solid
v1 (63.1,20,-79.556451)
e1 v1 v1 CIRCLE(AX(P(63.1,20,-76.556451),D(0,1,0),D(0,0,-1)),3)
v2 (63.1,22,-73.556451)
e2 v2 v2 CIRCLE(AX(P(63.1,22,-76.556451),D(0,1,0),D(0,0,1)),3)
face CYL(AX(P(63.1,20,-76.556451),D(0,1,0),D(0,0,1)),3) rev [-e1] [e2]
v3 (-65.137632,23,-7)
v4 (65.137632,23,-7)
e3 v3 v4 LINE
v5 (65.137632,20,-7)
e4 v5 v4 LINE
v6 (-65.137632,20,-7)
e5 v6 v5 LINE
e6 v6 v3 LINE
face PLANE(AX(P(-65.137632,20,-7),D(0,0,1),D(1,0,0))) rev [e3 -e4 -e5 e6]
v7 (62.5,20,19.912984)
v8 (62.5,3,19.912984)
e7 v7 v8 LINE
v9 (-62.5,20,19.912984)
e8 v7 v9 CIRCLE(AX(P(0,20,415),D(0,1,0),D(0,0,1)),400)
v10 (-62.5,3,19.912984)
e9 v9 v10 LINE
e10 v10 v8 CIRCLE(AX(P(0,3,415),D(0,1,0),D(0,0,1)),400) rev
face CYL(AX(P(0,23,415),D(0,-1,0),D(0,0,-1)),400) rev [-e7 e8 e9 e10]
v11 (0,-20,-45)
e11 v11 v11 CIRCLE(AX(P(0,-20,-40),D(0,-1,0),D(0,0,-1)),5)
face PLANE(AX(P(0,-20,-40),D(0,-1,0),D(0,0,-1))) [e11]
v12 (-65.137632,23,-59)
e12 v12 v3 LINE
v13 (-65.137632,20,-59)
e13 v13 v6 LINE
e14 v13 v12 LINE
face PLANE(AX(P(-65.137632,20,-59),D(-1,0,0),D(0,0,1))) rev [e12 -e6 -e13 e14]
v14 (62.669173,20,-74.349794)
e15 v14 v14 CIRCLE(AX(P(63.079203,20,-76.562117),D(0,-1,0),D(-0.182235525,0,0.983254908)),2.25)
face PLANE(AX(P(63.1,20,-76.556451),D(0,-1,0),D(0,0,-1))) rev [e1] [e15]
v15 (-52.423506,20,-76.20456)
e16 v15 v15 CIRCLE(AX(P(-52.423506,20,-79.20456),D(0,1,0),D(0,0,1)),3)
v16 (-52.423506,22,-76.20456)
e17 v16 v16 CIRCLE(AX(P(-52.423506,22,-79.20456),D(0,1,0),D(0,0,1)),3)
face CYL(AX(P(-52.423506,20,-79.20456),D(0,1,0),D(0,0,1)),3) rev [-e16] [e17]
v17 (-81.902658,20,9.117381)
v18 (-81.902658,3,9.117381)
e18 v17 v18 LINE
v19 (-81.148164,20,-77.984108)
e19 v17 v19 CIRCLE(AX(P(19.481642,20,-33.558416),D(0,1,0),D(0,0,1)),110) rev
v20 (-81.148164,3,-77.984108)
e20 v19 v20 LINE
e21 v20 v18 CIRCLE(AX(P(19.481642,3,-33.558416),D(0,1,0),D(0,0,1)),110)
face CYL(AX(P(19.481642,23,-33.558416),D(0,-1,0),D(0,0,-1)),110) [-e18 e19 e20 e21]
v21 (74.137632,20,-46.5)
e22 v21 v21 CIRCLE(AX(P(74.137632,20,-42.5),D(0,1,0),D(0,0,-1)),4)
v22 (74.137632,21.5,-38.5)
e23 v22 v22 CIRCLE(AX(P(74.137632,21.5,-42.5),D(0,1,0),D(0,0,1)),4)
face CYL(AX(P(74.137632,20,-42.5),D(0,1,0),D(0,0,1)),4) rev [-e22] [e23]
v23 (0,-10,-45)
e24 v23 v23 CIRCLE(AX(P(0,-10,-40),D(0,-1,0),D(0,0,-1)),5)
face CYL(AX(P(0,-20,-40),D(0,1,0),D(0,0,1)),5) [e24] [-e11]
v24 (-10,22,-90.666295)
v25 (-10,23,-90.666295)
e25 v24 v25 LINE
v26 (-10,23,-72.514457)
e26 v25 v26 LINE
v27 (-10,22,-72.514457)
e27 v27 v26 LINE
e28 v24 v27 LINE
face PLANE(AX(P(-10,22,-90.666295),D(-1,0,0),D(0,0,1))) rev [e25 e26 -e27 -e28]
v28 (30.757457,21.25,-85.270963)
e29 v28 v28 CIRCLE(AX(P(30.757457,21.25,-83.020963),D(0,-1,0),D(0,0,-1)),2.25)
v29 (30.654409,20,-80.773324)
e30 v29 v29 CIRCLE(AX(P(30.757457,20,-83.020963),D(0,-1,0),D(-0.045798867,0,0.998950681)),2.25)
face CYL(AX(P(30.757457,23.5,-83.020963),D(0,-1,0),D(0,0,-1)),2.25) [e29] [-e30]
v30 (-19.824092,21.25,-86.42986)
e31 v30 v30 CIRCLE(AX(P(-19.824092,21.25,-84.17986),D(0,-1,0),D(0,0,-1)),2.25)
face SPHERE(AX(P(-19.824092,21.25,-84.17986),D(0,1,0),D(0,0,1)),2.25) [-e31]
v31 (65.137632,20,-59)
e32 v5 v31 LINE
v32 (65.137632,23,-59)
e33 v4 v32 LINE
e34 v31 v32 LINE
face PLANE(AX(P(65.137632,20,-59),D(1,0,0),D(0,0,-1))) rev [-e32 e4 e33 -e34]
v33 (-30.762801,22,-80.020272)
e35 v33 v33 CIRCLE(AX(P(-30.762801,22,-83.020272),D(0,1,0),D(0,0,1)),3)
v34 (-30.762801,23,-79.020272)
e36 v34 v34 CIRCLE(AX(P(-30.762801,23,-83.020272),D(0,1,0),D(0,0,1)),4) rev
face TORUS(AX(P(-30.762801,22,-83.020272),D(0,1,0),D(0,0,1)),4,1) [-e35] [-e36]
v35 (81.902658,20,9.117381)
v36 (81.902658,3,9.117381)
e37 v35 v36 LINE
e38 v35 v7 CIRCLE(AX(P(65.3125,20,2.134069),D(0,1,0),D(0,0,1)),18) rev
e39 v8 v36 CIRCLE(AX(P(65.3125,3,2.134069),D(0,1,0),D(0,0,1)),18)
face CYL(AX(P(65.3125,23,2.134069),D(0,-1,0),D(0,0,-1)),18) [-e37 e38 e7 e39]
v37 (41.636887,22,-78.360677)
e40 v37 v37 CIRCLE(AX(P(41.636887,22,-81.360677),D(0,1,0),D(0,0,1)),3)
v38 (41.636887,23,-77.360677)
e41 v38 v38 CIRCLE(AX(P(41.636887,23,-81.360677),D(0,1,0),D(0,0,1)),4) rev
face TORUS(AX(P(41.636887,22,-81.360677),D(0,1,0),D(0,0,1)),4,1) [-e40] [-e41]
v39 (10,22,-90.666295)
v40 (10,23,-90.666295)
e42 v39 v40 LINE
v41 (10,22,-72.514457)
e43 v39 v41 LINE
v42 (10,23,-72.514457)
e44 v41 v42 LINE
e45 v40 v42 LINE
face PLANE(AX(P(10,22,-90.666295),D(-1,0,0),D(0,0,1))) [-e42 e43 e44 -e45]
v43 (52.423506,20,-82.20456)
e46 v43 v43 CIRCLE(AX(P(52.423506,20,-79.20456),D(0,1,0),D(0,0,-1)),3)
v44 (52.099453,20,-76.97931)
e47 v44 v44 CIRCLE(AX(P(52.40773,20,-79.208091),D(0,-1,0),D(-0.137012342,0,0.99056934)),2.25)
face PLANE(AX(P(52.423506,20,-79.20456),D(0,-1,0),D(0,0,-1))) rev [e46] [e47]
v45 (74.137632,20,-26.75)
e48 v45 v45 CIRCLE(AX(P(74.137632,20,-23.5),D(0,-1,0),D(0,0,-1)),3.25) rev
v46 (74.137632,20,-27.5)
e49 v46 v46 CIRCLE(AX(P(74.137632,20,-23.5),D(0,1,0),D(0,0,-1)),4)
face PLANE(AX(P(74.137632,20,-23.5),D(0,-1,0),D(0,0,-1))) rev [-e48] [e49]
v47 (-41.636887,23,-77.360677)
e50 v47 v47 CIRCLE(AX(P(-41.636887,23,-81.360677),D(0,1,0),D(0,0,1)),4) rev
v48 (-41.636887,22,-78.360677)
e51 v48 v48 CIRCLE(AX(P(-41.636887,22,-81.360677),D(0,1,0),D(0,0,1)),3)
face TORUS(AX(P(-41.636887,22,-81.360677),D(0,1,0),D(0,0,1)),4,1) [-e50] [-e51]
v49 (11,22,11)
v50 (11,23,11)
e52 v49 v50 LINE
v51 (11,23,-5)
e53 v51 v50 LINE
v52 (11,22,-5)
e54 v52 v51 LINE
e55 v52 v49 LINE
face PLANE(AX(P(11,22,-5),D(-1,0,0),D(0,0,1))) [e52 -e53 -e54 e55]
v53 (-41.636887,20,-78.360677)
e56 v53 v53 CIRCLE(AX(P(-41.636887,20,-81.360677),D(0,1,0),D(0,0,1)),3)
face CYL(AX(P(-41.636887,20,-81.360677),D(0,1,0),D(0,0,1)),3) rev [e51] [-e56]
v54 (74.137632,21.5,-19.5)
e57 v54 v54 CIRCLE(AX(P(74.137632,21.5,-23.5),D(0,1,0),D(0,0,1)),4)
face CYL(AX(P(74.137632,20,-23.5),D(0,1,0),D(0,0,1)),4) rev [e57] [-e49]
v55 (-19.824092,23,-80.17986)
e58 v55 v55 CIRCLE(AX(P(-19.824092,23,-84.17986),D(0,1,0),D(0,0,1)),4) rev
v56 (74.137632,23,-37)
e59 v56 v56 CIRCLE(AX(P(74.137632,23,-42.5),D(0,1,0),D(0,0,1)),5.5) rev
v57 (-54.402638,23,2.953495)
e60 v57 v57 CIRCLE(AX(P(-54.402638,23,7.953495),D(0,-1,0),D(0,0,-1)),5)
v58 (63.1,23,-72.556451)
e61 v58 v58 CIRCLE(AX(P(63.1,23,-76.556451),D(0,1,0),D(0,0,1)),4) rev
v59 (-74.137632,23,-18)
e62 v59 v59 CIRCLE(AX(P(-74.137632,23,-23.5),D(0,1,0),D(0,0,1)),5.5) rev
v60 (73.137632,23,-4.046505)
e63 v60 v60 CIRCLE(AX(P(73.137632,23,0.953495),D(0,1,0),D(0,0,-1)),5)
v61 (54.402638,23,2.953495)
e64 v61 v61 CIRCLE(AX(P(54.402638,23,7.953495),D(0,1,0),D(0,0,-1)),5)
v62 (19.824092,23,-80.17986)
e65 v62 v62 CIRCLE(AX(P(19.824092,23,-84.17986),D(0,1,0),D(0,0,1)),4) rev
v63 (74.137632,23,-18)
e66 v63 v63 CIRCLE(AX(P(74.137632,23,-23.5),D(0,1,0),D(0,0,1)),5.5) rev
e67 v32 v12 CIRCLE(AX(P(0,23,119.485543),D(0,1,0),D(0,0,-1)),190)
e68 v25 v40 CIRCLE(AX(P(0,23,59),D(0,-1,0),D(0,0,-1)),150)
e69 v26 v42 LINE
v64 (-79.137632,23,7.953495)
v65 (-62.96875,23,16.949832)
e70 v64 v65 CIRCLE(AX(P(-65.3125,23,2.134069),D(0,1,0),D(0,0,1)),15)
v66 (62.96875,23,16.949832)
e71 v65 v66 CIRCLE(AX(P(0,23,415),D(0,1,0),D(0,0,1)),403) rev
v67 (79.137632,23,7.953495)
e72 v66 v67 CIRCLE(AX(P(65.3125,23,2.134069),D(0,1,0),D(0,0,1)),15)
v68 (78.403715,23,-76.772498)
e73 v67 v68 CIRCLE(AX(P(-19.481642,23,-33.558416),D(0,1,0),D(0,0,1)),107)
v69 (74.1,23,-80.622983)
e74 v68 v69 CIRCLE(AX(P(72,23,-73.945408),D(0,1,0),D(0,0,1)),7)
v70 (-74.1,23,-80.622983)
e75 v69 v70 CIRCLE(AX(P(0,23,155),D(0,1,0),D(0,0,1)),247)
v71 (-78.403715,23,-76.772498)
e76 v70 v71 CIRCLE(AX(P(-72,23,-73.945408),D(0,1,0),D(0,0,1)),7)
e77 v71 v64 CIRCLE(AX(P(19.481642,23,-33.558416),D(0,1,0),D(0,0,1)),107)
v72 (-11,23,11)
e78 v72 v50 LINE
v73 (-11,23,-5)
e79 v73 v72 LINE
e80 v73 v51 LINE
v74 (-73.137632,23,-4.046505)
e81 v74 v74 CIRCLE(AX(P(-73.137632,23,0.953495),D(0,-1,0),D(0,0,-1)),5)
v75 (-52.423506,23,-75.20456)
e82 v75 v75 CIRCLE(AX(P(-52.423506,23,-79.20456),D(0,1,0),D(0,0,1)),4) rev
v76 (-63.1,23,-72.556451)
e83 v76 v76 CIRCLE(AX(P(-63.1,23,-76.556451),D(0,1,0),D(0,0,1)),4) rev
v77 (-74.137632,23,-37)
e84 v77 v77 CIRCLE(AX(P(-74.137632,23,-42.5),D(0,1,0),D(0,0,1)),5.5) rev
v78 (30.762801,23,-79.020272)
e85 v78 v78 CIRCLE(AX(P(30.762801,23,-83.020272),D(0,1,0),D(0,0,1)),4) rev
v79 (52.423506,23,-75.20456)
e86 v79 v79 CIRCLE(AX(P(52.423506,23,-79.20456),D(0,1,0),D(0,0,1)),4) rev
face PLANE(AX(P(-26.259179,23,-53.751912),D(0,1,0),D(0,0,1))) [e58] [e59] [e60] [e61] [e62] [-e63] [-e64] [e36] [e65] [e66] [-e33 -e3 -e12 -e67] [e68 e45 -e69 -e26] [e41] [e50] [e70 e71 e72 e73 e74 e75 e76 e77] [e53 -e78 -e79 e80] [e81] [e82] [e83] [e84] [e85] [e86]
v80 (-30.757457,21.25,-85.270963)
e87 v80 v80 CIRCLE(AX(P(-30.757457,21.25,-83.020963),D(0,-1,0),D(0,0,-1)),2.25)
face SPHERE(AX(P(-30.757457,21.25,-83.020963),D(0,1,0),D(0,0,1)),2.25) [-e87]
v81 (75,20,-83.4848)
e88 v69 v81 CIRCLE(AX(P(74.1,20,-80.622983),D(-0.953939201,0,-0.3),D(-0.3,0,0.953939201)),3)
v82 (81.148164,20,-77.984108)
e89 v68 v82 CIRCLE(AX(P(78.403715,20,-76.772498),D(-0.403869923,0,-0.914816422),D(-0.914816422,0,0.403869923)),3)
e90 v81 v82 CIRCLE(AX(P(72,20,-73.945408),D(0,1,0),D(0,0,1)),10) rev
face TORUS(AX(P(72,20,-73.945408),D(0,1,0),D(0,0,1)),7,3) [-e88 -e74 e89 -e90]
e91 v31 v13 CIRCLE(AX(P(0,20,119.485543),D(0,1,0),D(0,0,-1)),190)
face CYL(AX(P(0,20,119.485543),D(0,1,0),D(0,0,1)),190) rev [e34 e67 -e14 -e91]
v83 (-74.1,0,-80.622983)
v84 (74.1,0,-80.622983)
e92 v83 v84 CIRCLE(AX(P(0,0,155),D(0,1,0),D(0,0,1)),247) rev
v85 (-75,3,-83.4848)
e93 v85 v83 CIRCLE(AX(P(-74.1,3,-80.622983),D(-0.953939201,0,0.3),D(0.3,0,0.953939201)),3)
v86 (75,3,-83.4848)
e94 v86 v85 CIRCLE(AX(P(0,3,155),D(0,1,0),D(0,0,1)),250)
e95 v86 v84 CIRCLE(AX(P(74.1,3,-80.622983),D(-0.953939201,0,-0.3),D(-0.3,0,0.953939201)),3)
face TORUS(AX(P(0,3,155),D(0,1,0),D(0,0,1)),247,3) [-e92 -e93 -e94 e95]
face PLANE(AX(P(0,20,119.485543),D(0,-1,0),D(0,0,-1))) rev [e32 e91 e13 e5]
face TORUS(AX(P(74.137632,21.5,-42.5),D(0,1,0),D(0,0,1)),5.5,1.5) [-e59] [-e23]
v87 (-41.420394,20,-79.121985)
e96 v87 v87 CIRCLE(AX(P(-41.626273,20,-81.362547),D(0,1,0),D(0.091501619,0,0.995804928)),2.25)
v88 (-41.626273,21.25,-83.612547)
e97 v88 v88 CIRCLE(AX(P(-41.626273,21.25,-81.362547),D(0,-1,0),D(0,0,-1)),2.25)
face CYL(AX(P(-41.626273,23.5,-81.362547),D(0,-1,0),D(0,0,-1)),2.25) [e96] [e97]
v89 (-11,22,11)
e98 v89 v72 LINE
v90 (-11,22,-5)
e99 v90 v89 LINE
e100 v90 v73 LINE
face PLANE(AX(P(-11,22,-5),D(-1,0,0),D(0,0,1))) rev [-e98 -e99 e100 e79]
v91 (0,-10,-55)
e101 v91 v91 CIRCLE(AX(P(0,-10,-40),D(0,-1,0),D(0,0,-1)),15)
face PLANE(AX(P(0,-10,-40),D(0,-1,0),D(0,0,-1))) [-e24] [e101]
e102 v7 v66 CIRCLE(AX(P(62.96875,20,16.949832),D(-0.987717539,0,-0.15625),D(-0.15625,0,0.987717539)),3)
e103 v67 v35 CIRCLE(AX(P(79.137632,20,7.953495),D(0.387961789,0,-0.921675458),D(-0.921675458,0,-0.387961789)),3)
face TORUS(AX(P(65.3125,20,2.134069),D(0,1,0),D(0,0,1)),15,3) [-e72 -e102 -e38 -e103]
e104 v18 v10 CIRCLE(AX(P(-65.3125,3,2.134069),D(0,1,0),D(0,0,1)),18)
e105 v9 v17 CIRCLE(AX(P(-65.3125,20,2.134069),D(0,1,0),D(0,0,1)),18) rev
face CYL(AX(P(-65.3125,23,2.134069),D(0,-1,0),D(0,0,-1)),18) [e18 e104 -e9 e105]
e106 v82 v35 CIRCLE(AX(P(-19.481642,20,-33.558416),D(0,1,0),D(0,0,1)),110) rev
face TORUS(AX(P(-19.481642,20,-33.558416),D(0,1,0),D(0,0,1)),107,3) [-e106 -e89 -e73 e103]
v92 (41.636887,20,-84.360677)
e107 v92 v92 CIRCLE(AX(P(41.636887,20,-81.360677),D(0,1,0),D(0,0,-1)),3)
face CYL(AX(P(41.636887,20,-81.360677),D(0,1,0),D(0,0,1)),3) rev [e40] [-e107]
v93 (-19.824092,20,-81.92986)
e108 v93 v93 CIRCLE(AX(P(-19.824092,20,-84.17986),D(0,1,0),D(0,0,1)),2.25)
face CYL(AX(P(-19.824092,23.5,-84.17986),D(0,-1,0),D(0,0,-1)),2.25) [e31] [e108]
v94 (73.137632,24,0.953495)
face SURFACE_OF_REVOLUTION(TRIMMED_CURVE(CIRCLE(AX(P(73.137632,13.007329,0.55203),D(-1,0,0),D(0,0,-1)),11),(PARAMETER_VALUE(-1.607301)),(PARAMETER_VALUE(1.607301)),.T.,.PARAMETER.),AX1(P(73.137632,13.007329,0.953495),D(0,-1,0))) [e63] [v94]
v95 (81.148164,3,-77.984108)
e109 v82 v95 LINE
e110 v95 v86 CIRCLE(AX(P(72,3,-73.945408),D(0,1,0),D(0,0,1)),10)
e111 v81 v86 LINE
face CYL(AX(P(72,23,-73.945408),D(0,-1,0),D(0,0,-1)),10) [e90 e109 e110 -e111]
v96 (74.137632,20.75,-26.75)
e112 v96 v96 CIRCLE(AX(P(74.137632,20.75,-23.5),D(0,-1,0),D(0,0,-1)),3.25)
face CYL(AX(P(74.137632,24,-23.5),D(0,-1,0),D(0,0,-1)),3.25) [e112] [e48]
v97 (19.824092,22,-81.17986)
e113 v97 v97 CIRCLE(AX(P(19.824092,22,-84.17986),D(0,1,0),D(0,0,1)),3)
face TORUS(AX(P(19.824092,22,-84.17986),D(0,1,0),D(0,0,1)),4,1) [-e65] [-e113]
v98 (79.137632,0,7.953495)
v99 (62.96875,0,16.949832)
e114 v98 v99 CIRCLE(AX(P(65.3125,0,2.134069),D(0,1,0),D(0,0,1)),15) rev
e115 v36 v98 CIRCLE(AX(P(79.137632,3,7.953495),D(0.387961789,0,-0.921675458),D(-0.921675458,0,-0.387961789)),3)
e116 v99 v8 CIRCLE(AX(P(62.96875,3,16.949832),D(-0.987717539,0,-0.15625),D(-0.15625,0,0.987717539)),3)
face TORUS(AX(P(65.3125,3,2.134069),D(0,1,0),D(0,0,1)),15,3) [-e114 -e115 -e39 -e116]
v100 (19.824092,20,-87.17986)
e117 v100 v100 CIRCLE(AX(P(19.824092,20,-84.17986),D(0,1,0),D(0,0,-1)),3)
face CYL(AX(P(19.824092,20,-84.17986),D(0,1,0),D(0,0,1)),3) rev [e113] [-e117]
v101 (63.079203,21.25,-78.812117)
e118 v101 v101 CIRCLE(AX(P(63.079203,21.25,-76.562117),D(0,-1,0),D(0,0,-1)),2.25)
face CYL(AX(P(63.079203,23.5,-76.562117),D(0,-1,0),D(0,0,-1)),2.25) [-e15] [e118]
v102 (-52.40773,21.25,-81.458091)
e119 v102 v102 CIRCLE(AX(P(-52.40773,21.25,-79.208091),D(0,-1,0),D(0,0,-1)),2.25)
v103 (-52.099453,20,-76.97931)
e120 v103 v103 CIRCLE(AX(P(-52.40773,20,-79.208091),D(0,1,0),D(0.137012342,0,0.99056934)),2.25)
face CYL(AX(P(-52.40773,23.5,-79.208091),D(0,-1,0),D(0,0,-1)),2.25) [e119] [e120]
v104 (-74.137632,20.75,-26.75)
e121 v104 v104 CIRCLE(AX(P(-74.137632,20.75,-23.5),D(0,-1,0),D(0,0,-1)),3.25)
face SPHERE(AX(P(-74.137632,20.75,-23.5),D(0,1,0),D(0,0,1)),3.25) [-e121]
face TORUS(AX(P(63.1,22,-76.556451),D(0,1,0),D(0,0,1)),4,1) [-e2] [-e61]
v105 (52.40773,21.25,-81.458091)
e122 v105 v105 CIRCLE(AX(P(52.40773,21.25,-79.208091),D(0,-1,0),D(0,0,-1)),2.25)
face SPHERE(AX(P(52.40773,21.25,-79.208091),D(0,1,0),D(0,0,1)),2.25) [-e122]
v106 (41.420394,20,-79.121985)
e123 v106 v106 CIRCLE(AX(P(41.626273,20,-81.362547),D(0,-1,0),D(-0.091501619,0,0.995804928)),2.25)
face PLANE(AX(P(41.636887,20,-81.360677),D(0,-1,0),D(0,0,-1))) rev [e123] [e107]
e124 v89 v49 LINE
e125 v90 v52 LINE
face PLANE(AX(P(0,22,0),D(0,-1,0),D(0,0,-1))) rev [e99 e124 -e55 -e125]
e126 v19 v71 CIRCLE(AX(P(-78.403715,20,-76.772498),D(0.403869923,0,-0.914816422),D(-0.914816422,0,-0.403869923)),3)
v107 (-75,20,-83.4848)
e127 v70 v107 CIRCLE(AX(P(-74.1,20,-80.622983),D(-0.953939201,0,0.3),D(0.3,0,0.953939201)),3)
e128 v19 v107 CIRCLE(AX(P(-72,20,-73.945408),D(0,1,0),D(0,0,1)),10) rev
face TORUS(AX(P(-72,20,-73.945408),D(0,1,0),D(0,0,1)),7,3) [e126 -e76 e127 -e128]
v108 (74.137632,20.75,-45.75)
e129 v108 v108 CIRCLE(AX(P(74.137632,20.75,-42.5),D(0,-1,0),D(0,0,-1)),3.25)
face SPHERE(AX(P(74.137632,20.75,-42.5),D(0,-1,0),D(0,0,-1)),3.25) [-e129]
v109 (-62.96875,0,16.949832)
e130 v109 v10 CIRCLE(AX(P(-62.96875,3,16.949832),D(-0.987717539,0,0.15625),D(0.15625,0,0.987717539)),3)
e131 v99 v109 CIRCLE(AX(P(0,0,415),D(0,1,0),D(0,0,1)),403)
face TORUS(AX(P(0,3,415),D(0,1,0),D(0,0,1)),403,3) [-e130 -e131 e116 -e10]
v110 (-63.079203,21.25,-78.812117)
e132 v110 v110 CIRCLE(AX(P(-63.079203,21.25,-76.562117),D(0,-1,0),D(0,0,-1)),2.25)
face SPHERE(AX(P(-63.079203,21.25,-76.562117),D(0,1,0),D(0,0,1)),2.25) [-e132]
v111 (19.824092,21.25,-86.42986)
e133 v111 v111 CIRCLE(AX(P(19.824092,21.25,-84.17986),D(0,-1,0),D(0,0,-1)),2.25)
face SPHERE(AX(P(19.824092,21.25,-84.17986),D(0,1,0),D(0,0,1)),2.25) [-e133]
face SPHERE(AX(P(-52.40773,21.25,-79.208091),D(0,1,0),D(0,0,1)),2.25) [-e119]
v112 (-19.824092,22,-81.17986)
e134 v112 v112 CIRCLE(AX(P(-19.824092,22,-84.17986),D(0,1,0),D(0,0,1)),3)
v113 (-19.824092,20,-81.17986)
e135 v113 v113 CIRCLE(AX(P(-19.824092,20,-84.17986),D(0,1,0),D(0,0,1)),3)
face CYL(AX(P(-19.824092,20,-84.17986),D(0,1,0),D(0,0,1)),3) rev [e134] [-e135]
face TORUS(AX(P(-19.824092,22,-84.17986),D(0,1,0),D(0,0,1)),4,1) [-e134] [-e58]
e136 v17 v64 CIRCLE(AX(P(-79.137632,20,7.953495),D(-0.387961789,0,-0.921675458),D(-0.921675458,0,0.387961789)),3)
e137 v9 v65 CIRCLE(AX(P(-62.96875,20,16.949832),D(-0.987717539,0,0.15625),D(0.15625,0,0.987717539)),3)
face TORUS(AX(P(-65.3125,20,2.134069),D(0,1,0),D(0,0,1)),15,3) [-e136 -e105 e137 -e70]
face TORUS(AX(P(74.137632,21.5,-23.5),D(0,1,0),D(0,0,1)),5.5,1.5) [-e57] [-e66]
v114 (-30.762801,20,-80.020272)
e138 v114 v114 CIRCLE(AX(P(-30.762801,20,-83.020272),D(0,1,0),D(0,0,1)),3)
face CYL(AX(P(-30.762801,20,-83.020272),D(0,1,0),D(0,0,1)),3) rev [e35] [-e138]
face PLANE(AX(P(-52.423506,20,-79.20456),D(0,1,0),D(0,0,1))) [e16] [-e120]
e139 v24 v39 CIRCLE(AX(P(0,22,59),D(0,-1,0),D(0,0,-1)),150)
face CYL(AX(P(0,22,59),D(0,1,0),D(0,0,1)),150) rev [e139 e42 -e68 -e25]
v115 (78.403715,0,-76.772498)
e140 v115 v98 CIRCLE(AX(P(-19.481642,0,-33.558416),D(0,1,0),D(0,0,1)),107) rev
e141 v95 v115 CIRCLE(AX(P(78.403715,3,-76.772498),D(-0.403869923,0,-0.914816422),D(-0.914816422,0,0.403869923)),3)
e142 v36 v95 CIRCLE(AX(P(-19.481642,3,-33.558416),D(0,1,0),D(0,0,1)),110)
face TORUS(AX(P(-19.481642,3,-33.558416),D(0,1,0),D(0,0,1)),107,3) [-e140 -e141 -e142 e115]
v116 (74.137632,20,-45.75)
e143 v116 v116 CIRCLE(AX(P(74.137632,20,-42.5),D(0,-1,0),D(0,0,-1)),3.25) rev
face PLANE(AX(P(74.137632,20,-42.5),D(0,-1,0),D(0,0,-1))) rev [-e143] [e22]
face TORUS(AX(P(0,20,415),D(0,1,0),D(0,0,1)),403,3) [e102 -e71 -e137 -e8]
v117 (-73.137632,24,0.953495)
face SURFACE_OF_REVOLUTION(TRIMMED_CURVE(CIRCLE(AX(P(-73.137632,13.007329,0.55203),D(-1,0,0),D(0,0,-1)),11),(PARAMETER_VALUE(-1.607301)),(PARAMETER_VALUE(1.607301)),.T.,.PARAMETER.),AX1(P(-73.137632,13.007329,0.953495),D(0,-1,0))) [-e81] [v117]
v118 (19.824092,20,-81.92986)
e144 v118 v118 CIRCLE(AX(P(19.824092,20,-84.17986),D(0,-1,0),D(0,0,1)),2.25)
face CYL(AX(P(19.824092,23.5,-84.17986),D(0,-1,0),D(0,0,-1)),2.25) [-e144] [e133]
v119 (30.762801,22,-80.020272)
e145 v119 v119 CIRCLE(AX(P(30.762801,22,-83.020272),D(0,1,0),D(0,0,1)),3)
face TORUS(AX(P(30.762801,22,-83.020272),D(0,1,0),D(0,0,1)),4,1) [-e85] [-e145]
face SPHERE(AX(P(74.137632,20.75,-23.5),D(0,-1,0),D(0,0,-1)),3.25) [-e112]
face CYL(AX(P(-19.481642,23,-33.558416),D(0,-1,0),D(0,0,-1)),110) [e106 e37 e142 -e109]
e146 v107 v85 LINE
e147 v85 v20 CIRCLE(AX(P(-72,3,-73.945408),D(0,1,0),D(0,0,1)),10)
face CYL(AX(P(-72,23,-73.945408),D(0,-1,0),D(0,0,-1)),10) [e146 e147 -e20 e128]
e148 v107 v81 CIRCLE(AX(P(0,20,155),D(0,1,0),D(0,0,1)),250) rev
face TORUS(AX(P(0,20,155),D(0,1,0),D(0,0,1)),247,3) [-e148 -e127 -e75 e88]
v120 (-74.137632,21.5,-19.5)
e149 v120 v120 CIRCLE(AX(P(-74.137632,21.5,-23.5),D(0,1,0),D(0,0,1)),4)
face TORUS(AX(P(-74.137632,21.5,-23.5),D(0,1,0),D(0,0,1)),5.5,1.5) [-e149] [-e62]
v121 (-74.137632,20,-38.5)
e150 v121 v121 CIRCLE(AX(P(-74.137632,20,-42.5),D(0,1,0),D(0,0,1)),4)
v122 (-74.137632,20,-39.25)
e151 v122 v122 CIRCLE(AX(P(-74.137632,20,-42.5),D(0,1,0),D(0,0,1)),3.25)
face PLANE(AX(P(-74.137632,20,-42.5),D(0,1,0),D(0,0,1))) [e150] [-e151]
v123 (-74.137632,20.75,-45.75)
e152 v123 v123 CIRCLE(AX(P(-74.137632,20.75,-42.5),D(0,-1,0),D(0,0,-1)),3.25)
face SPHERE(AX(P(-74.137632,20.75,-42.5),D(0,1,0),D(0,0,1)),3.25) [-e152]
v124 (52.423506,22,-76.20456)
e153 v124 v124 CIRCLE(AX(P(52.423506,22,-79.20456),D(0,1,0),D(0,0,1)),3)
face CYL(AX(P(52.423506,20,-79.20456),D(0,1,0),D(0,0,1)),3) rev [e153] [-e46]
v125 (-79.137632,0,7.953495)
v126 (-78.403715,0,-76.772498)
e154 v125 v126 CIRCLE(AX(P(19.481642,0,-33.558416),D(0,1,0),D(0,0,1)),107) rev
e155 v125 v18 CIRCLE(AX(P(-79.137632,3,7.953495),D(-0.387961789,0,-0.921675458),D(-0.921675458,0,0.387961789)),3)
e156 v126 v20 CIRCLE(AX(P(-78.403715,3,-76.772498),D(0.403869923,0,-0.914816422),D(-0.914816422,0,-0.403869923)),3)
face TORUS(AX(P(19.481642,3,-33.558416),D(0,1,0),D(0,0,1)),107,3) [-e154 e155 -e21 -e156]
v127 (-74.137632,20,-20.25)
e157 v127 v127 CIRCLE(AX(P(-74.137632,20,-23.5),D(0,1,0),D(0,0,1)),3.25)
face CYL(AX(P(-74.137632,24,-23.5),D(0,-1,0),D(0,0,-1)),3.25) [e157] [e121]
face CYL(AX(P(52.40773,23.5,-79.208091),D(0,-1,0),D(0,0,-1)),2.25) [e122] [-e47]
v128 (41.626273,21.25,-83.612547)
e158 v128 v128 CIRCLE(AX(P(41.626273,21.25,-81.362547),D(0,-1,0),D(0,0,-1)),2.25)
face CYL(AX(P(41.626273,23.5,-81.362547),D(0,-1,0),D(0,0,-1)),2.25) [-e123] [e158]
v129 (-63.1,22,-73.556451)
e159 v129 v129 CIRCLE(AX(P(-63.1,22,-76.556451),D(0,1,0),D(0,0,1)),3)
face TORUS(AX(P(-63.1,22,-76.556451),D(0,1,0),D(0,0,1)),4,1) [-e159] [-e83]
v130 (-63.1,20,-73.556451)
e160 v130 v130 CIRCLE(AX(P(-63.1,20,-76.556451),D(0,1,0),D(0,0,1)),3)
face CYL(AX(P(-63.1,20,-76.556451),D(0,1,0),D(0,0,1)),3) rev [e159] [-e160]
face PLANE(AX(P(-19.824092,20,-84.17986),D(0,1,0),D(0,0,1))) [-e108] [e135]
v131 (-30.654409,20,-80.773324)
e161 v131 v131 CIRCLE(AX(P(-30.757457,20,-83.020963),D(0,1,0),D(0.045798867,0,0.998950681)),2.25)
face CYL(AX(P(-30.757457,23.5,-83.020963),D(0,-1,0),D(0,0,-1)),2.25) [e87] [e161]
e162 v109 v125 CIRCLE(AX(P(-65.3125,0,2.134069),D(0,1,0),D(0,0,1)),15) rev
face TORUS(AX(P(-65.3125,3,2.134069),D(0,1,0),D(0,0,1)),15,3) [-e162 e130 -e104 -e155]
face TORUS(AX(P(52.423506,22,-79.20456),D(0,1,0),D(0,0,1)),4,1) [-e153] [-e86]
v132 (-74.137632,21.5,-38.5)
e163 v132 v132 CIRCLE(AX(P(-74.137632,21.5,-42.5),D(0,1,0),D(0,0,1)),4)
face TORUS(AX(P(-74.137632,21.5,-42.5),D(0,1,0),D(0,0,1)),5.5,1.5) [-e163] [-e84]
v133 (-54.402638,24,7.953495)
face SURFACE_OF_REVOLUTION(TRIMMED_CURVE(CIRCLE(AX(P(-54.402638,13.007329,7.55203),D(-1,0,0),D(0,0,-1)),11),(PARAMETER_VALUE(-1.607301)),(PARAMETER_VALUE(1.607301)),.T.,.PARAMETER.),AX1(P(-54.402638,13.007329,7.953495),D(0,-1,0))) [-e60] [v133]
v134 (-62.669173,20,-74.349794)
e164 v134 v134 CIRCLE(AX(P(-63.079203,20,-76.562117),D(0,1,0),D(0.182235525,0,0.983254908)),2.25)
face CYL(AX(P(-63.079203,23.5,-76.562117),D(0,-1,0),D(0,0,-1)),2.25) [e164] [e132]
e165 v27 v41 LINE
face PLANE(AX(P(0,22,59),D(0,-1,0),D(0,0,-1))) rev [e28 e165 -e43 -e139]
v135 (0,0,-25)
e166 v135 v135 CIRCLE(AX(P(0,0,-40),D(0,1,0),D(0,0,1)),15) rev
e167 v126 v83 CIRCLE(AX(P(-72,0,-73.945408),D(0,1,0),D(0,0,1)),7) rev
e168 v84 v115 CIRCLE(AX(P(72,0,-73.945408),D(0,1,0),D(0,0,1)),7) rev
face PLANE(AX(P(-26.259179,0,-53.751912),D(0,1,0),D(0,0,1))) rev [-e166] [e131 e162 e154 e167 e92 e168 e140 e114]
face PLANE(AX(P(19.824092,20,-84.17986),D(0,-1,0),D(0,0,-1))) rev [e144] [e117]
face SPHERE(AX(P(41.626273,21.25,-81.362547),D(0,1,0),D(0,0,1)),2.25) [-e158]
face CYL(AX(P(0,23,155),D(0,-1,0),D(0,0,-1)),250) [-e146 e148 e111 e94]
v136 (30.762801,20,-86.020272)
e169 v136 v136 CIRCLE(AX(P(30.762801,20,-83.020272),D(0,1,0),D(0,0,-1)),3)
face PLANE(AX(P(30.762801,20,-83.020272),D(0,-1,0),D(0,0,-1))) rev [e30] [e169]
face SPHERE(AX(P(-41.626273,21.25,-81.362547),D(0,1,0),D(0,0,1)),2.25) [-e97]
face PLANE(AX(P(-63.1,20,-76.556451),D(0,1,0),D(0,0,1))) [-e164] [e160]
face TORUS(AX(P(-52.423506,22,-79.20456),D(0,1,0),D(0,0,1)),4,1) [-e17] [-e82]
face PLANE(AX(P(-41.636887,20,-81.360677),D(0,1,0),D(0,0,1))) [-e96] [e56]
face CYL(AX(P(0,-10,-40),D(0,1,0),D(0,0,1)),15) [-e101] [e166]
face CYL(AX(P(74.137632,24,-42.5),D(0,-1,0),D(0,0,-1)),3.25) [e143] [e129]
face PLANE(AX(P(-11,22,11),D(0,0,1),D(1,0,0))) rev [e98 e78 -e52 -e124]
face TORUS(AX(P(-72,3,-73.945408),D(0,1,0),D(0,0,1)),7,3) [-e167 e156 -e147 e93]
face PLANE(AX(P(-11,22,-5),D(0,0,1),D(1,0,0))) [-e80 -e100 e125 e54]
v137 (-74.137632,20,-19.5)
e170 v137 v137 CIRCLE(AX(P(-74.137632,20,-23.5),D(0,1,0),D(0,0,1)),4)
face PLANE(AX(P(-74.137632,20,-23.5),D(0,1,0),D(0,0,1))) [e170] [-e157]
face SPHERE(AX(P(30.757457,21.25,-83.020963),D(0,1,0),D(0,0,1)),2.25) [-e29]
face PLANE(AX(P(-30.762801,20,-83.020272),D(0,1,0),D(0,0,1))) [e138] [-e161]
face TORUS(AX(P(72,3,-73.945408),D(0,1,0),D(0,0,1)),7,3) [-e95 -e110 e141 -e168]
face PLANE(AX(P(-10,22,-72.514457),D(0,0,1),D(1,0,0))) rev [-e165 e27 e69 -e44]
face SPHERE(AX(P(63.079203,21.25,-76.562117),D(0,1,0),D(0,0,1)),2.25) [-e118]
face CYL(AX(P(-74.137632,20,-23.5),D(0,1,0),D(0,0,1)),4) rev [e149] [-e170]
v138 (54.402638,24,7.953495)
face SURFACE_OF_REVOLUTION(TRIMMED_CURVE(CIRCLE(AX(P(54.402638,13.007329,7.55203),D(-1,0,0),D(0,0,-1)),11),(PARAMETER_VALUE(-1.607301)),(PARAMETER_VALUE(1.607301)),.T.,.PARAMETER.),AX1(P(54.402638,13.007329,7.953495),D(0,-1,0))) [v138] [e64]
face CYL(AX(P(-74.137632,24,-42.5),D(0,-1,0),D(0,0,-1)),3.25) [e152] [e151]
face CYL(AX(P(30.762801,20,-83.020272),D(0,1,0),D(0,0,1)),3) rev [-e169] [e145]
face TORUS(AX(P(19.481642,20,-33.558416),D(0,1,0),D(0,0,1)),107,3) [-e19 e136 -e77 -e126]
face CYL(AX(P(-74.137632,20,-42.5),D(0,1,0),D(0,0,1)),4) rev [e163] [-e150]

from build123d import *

# Parameters (mm, degrees)
BOSS_EXTRUDE1_DEPTH      = 23
FILLET1_R                = 3
CUT_EXTRUDE1_DEPTH       = 3
CUT_EXTRUDE2_DEPTH       = 1
SKETCH4_R                = 3
CUT_EXTRUDE3_DEPTH       = 3
FILLET2_R                = 1
SKETCH5_R                = 2.25
BOSS_EXTRUDE2_DEPTH      = 3.5
FILLET5_R                = 2.25
CIRPATTERN1_COUNT        = 5
CIRPATTERN1_ANGLE        = 10.5
FILLET5_OF_CIRPATTERN1_R = 2.25
SKETCH7_R                = 4
CUT_EXTRUDE4_DEPTH       = 3
FILLET6_R                = 1.5
SKETCH8_R                = 3.25
BOSS_EXTRUDE4_DEPTH      = 4
FILLET7_R                = 3.25
LPATTERN1_COUNT          = 2
LPATTERN1_PITCH          = 20
SKETCH13_W               = 22
SKETCH13_H               = 16
CUT_EXTRUDE5_DEPTH       = 1
SKETCH14_R               = 15
BOSS_EXTRUDE5_DEPTH      = 10
SKETCH15_R               = 5
BOSS_EXTRUDE6_DEPTH      = 10


# Read off the part's stored shape, not the designer's step: Mirror1
with BuildPart() as part:
    # Sketch1 → Boss-Extrude1 (new body)
    with BuildSketch(Plane(origin=(0, 0, 0), x_dir=(1, 0, 0), z_dir=(0, 1, 0))):
        with BuildLine():
            ThreePointArc((-75, 83.484800354), (0, 95), (75, 83.484800354))
            ThreePointArc((75, 83.484800354), (78.66774915, 81.397999921), (81.148164216, 77.984107572))
            ThreePointArc((81.148164216, 77.984107572), (90.514231183, 34.511226724), (81.902658248, -9.117380762))
            ThreePointArc((81.902658248, -9.117380762), (74.064198719, -17.863269733), (62.5, -19.912984268))
            ThreePointArc((62.5, -19.912984268), (0, -15), (-62.5, -19.912984268))
            ThreePointArc((-62.5, -19.912984268), (-74.064198719, -17.863269733), (-81.902658248, -9.117380762))
            ThreePointArc((-81.902658248, -9.117380762), (-90.514231183, 34.511226724), (-81.148164216, 77.984107572))
            ThreePointArc((-81.148164216, 77.984107572), (-78.66774915, 81.397999921), (-75, 83.484800354))
        make_face()
    extrude(amount=BOSS_EXTRUDE1_DEPTH)

    # Fillet1
    fillet1_edges = [part.edges().sort_by_distance(p)[0] for p in [
        (-74.064198719, 23, 17.863269733),
        (-90.514231183, 0, -34.511226724),
        (-78.66774915, 0, -81.397999921),
        (0, 23, 15),
        (74.064198719, 23, 17.863269733),
        (90.514231183, 23, -34.511226724),
        (78.66774915, 23, -81.397999921),
        (0, 23, -95),
        (-78.66774915, 23, -81.397999921),
        (-90.514231183, 23, -34.511226724),
        (0, 0, -95),
        (78.66774915, 0, -81.397999921),
        (90.514231183, 0, -34.511226724),
        (74.064198719, 0, 17.863269733),
        (0, 0, 15),
        (-74.064198719, 0, 17.863269733),
    ]]
    fillet(fillet1_edges, radius=FILLET1_R)

    # Sketch2 → Cut-Extrude1 (cut)
    with BuildSketch(Plane(origin=(0, 23, 0), x_dir=(1, 0, 0), z_dir=(0, 1, 0))):
        with BuildLine():
            Line((-65.137631873, 59), (-65.137631873, 7))
            Line((-65.137631873, 7), (65.137631873, 7))
            Line((65.137631873, 7), (65.137631873, 59))
            ThreePointArc((65.137631873, 59), (0, 70.514457409), (-65.137631873, 59))
        make_face()
    extrude(amount=-CUT_EXTRUDE1_DEPTH, mode=Mode.SUBTRACT)

    # Sketch3 → Cut-Extrude2 (cut)
    with BuildSketch(Plane(origin=(0, 23, 0), x_dir=(1, 0, 0), z_dir=(0, 1, 0))):
        with BuildLine():
            Line((-10, 90.666295471), (-10, 72.514457409))
            Line((-10, 72.514457409), (10, 72.514457409))
            Line((10, 72.514457409), (10, 90.666295471))
            ThreePointArc((10, 90.666295471), (0, 91), (-10, 90.666295471))
        make_face()
    extrude(amount=-CUT_EXTRUDE2_DEPTH, mode=Mode.SUBTRACT)

    # Sketch4 → Cut-Extrude3 (cut)
    with BuildSketch(Plane(origin=(0, 23, 0), x_dir=(1, 0, 0), z_dir=(0, 1, 0))):
        with Locations(Location((-63.1, 76.556451001, 0), (0, 0, 270))):
            Circle(SKETCH4_R)
        with Locations(Location((-52.423506287, 79.204560136, 0), (0, 0, 270))):
            Circle(SKETCH4_R)
        with Locations(Location((-41.636886805, 81.360677053, 0), (0, 0, 270))):
            Circle(SKETCH4_R)
        with Locations(Location((-30.762800947, 83.020272409, 0), (0, 0, 270))):
            Circle(SKETCH4_R)
        with Locations(Location((-19.824091844, 84.179859902, 0), (0, 0, 270))):
            Circle(SKETCH4_R)
        with Locations(Location((63.1, 76.556451001, 0), (0, 0, 90))):
            Circle(SKETCH4_R)
        with Locations(Location((41.636886805, 81.360677053, 0), (0, 0, 90))):
            Circle(SKETCH4_R)
        with Locations(Location((52.423506287, 79.204560136, 0), (0, 0, 90))):
            Circle(SKETCH4_R)
        with Locations(Location((19.824091844, 84.179859902, 0), (0, 0, 90))):
            Circle(SKETCH4_R)
        with Locations(Location((30.762800947, 83.020272409, 0), (0, 0, 90))):
            Circle(SKETCH4_R)
    extrude(amount=-CUT_EXTRUDE3_DEPTH, mode=Mode.SUBTRACT)

    # Fillet2
    fillet2_edges = [part.edges().sort_by_distance(p)[0] for p in [
        (-63.1, 23, -79.556451001),
        (-52.423506287, 23, -82.204560136),
        (-41.636886805, 23, -84.360677053),
        (-30.762800947, 23, -86.020272409),
        (-19.824091844, 23, -87.179859902),
        (63.1, 23, -73.556451001),
        (41.636886805, 23, -78.360677053),
        (52.423506287, 23, -76.204560136),
        (19.824091844, 23, -81.179859902),
        (30.762800947, 23, -80.020272409),
    ]]
    fillet(fillet2_edges, radius=FILLET2_R)

    # Sketch5 → Boss-Extrude2 (add)
    with BuildSketch(Plane(origin=(0, 20, 0), x_dir=(1, 0, 0), z_dir=(0, 1, 0))):
        with Locations(Location((-19.824091844, 84.179859902, 0), (0, 0, 270))):
            Circle(SKETCH5_R)
    boss_extrude2 = extrude(amount=BOSS_EXTRUDE2_DEPTH)

    # Fillet5
    fillet5_edges = [part.edges().sort_by_distance(p)[0] for p in [
        (-19.824091844, 23.5, -86.429859902),
    ]]
    fillet(fillet5_edges, radius=FILLET5_R)

    # CirPattern1: Boss-Extrude2 ×5 about axis
    cirpattern1_axis = Axis((0, 0, 155), (0, 1, 0))
    for i in range(1, CIRPATTERN1_COUNT):
        add(boss_extrude2.rotate(cirpattern1_axis, i * CIRPATTERN1_ANGLE / (CIRPATTERN1_COUNT - 1)))

    # Fillet5 of CirPattern1
    fillet5_of_cirpattern1_edges = [part.edges().sort_by_distance(p)[0] for p in [
        (-30.860504083, 23.5, -85.268602105),
        (-41.832151317, 23.5, -83.603107661),
        (-52.71600804, 23.5, -81.436871841),
        (-63.489232982, 23.5, -78.774440786),
    ]]
    fillet(fillet5_of_cirpattern1_edges, radius=FILLET5_OF_CIRPATTERN1_R)

    # Mirror1 outline → Mirror1 (revolve)
    with BuildSketch(Plane(origin=(19.824091844, 0, -84.179859902), x_dir=(1, 0, 0), z_dir=(0, 0, 1))):
        with BuildLine():
            Line((2.25, 20), (2.25, 21.249999998))
            ThreePointArc((2.25, 21.249999998), (1.590990258, 22.840990257), (0, 23.5))
            Line((0, 23.5), (0, 20))
            Line((0, 20), (2.25, 20))
        make_face()
    revolve(axis=Axis((19.824091844, 0, -84.179859902), (0, 1, 0)))

    # Mirror1 2 outline → Mirror1 2 (revolve)
    with BuildSketch(Plane(origin=(30.757456632, 0, -83.020963072), x_dir=(1, 0, 0), z_dir=(0, 0, 1))):
        with BuildLine():
            Line((2.25, 20), (2.25, 21.249999998))
            ThreePointArc((2.25, 21.249999998), (1.590990258, 22.840990257), (0, 23.5))
            Line((0, 23.5), (0, 20))
            Line((0, 20), (2.25, 20))
        make_face()
    revolve(axis=Axis((30.757456632, 0, -83.020963072), (0, 1, 0)))

    # Mirror1 3 outline → Mirror1 3 (revolve)
    with BuildSketch(Plane(origin=(41.626272675, 0, -81.362546574), x_dir=(1, 0, 0), z_dir=(0, 0, 1))):
        with BuildLine():
            Line((2.25, 20), (2.25, 21.249999998))
            ThreePointArc((2.25, 21.249999998), (1.590990258, 22.840990257), (0, 23.5))
            Line((0, 23.5), (0, 20))
            Line((0, 20), (2.25, 20))
        make_face()
    revolve(axis=Axis((41.626272675, 0, -81.362546574), (0, 1, 0)))

    # Mirror1 4 outline → Mirror1 4 (revolve)
    with BuildSketch(Plane(origin=(52.407730271, 0, -79.208090825), x_dir=(1, 0, 0), z_dir=(0, 0, 1))):
        with BuildLine():
            Line((2.25, 20), (2.25, 21.249999998))
            ThreePointArc((2.25, 21.249999998), (1.590990258, 22.840990257), (0, 23.5))
            Line((0, 23.5), (0, 20))
            Line((0, 20), (2.25, 20))
        make_face()
    revolve(axis=Axis((52.407730271, 0, -79.208090825), (0, 1, 0)))

    # Mirror1 5 outline → Mirror1 5 (revolve)
    with BuildSketch(Plane(origin=(63.07920305, 0, -76.562117244), x_dir=(1, 0, 0), z_dir=(0, 0, 1))):
        with BuildLine():
            Line((2.25, 20), (2.25, 21.249999998))
            ThreePointArc((2.25, 21.249999998), (1.590990258, 22.840990257), (0, 23.5))
            Line((0, 23.5), (0, 20))
            Line((0, 20), (2.25, 20))
        make_face()
    revolve(axis=Axis((63.07920305, 0, -76.562117244), (0, 1, 0)))

    # Sketch7 → Cut-Extrude4 (cut)
    with BuildSketch(Plane(origin=(0, 23, 0), x_dir=(1, 0, 0), z_dir=(0, 1, 0))):
        with Locations(Location((-74.137631873, 42.5, 0), (0, 0, 270))):
            Circle(SKETCH7_R)
        with Locations(Location((-74.137631873, 23.5, 0), (0, 0, 270))):
            Circle(SKETCH7_R)
        with Locations(Location((74.137631873, 23.5, 0), (0, 0, 90))):
            Circle(SKETCH7_R)
        with Locations(Location((74.137631873, 42.5, 0), (0, 0, 90))):
            Circle(SKETCH7_R)
    extrude(amount=-CUT_EXTRUDE4_DEPTH, mode=Mode.SUBTRACT)

    # Fillet6
    fillet6_edges = [part.edges().sort_by_distance(p)[0] for p in [
        (-74.137631873, 23, -46.5),
        (-74.137631873, 23, -27.5),
        (74.137631873, 23, -19.5),
        (74.137631873, 23, -38.5),
    ]]
    fillet(fillet6_edges, radius=FILLET6_R)

    # Sketch8 → Boss-Extrude4 (add)
    with BuildSketch(Plane(origin=(0, 20, 0), x_dir=(1, 0, 0), z_dir=(0, 1, 0))):
        with Locations(Location((-74.137631873, 42.5, 0), (0, 0, 270))):
            Circle(SKETCH8_R)
        with Locations(Location((-74.137631873, 23.5, 0), (0, 0, 270))):
            Circle(SKETCH8_R)
        with Locations(Location((74.137631873, 23.5, 0), (0, 0, 90))):
            Circle(SKETCH8_R)
        with Locations(Location((74.137631873, 42.5, 0), (0, 0, 90))):
            Circle(SKETCH8_R)
    extrude(amount=BOSS_EXTRUDE4_DEPTH)

    # Fillet7
    fillet7_edges = [part.edges().sort_by_distance(p)[0] for p in [
        (-74.137631873, 24, -45.75),
        (-74.137631873, 24, -26.75),
        (74.137631873, 24, -20.25),
        (74.137631873, 24, -39.25),
    ]]
    fillet(fillet7_edges, radius=FILLET7_R)

    # Sketch11 → Revolve1 (revolve)
    with BuildSketch(Plane.XY.offset(0.953495395)):
        with BuildLine():
            Line((-78.137631873, 23), (-73.137631873, 23))
            Line((-73.137631873, 23), (-73.137631873, 24))
            ThreePointArc((-73.137631873, 24), (-75.696375073, 23.793715997), (-78.137631873, 23))
        make_face()
    revolve1 = revolve(axis=Axis((-73.137631873, 23, 0.953495395), (0, 1, 0)))

    # LPattern1: Revolve1 ×2
    with Locations(*[Vector(0.9367496997597597, 0, 0.3500000000000001) * (i * LPATTERN1_PITCH) for i in range(1, LPATTERN1_COUNT)]):
        add(revolve1)

    # Mirror2: Revolve1 across plane
    add(revolve1.mirror(Plane(origin=(0, 0, 0), x_dir=(0, 0, 1), z_dir=(1, 0, 0))))

    # Mirror2 copy 1 sketch → Mirror2 copy 1 (revolve)
    with BuildSketch(Plane(origin=(-18.734993995, 0, 7.953495395), x_dir=(-1, 0, 0), z_dir=(0, 0, 1))):
        with BuildLine():
            Line((-78.137631873, -23), (-73.137631873, -23))
            Line((-73.137631873, -23), (-73.137631873, -24))
            ThreePointArc((-73.137631873, -24), (-75.696375073, -23.793715997), (-78.137631873, -23))
        make_face()
    revolve(axis=Axis((54.402637878, 23, 7.953495395), (0, -1, 0)))

    # Sketch13 → Cut-Extrude5 (cut)
    with BuildSketch(Plane(origin=(0, 23, 0), x_dir=(1, 0, 0), z_dir=(0, 1, 0))):
        with Locations((0, -3)):
            Rectangle(SKETCH13_W, SKETCH13_H)
    extrude(amount=-CUT_EXTRUDE5_DEPTH, mode=Mode.SUBTRACT)

    # Sketch14 → Boss-Extrude5 (add)
    with BuildSketch(Plane.XZ):
        with Locations(Location((0, -40, 0), (0, 0, 90))):
            Circle(SKETCH14_R)
    extrude(amount=BOSS_EXTRUDE5_DEPTH)

    # Sketch15 → Boss-Extrude6 (add)
    with BuildSketch(Plane.XZ.offset(10)):
        with Locations(Location((0, -40, 0), (0, 0, 270))):
            Circle(SKETCH15_R)
    extrude(amount=BOSS_EXTRUDE6_DEPTH)


solid = part.part
